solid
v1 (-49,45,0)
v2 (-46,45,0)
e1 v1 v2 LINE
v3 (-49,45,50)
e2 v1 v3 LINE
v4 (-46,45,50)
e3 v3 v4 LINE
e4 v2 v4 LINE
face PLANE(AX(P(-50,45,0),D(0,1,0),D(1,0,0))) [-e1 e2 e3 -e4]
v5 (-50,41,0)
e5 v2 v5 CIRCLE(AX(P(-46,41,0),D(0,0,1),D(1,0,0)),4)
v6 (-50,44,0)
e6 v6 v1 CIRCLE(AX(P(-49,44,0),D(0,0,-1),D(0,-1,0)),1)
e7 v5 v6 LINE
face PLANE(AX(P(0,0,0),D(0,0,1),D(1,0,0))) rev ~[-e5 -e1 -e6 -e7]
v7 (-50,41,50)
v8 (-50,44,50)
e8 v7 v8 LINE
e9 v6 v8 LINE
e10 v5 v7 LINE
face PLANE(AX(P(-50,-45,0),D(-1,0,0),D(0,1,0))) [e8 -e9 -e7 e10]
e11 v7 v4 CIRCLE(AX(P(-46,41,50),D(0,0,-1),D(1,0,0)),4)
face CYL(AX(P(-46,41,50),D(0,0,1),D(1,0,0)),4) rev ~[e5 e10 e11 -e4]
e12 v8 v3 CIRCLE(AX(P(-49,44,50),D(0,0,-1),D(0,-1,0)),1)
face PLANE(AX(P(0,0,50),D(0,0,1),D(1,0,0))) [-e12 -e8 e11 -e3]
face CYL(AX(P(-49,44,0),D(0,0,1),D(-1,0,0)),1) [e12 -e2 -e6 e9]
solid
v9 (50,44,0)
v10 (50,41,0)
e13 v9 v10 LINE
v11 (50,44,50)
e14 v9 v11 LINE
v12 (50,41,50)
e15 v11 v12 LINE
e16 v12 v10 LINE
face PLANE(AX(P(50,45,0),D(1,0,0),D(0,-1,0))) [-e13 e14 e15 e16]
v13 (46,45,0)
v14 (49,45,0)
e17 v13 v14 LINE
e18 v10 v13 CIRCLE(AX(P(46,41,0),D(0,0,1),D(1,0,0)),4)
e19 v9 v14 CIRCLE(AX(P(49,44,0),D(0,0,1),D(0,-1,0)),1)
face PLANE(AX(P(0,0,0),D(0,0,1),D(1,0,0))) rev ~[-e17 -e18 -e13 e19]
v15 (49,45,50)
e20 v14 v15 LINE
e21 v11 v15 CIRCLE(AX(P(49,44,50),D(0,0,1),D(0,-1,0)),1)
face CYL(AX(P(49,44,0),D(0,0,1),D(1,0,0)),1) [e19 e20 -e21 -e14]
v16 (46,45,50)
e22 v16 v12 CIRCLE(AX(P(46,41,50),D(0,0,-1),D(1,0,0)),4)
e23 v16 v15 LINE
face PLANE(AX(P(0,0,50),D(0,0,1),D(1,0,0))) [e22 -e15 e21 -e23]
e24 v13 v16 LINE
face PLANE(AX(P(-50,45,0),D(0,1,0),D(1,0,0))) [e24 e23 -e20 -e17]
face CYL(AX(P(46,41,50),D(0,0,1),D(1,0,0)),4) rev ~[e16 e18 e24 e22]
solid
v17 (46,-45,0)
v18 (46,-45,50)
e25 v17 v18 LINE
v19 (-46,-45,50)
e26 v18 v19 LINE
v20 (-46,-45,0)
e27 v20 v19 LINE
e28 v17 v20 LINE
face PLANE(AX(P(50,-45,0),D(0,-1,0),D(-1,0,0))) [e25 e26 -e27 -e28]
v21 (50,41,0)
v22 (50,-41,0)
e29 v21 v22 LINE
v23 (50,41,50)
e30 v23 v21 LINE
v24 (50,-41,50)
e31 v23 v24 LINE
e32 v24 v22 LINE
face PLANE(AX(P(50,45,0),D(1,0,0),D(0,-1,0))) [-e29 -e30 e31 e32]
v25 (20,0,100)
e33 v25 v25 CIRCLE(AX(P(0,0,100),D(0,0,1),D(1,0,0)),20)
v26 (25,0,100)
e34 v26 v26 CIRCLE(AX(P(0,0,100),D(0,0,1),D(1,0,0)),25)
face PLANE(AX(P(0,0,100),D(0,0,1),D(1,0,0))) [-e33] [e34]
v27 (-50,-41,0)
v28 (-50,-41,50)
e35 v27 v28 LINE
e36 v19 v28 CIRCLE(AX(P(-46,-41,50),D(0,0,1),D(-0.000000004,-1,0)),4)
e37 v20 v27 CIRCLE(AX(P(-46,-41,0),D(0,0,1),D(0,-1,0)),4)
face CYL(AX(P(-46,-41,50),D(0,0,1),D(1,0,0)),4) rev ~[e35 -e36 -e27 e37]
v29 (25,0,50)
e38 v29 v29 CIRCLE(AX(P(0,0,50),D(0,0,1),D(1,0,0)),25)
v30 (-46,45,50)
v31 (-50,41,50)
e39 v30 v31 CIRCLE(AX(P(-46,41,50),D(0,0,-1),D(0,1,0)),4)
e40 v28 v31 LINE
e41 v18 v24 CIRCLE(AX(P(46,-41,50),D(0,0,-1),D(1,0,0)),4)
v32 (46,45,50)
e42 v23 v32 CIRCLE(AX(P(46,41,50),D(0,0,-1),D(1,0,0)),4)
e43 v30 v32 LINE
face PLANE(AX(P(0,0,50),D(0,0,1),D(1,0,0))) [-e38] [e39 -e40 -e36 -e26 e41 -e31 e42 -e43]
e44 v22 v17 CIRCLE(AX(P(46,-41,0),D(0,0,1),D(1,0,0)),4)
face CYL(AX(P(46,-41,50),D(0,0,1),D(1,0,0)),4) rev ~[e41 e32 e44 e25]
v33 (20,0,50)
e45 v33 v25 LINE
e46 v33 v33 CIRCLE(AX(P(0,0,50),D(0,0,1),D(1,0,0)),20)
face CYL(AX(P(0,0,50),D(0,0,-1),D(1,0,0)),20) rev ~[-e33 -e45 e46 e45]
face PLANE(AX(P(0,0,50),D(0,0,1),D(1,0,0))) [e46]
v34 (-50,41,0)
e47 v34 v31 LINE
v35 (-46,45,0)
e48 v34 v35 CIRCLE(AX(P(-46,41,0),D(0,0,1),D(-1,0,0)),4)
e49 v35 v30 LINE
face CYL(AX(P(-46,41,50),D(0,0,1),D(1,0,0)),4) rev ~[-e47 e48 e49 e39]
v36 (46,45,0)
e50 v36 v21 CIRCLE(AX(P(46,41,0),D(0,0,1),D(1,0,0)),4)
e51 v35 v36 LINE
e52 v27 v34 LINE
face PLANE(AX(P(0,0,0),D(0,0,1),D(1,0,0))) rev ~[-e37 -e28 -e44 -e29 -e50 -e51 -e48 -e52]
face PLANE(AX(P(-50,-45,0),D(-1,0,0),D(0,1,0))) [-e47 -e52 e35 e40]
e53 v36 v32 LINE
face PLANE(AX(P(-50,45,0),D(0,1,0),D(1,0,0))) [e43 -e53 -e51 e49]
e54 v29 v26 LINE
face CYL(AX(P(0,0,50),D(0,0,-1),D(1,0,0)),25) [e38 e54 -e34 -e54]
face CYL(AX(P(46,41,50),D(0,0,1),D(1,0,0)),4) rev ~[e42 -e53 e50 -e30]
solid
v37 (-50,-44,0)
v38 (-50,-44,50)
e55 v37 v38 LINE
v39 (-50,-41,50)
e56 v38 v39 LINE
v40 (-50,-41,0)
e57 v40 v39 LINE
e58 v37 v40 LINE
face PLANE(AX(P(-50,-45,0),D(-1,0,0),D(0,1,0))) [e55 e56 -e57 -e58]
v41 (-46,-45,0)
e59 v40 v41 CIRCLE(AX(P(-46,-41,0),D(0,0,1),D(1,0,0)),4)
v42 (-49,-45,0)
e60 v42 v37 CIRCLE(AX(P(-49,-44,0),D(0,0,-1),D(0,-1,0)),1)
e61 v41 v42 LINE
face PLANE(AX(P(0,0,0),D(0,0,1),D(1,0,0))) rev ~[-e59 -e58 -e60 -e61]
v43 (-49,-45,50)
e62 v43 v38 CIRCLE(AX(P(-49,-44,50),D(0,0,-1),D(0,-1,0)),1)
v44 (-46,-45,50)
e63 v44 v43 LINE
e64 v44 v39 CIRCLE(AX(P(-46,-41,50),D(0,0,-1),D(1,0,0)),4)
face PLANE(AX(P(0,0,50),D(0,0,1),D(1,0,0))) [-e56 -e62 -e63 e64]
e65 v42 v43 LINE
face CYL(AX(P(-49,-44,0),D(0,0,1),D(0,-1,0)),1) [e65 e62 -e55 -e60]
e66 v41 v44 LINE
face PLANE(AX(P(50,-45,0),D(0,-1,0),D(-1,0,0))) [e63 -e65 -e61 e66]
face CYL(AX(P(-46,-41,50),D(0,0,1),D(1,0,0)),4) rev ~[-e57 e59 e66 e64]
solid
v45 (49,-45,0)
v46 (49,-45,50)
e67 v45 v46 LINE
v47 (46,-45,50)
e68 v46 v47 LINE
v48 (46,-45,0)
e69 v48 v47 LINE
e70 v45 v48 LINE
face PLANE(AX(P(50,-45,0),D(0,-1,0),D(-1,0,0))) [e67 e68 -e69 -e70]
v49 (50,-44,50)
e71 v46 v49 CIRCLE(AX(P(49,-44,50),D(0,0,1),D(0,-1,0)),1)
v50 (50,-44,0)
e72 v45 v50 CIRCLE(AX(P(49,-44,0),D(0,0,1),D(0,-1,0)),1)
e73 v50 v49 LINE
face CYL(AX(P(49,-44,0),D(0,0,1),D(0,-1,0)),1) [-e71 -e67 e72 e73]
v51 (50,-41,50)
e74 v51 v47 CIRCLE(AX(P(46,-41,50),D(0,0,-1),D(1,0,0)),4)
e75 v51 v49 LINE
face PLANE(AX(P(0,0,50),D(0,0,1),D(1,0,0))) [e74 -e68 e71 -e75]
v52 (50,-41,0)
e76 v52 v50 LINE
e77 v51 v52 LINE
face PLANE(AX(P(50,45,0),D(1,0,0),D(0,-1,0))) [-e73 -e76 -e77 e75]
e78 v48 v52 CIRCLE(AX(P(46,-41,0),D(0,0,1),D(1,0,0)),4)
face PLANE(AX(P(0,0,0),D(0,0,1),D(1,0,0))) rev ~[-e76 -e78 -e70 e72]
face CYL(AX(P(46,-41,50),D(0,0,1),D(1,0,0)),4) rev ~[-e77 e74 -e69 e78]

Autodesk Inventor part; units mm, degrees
ref_plane "YZ Plane" through (0, 0, 0) normal (1, 0, 0) x (0, 1, 0)
ref_plane "XZ Plane" through (0, 0, 0) normal (0, 1, 0) x (-1, 0, 0)
ref_plane "XY Plane" through (0, 0, 0) normal (0, 0, 1) x (1, 0, 0)
sketch "Sketch1" plane through (0, 0, 0) normal (0, 0, 1) x (1, 0, 0)
  line L0 (50, -45) -> (-50, -45)
  line L1 (-50, -45) -> (-50, 45)
  line L2 (-50, 45) -> (50, 45)
  line L3 (50, 45) -> (50, -45)
  line L4 (50, -45) -> (-50, 45) construction
  line L5 (-50, -45) -> (50, 45) construction
  point P0 (0, 0)
  dimension "d0" = 100
  dimension "d1" = 90
extrude "Extrusion1" add sketch "Sketch1" along normal blind 50
sketch "Sketch2" plane through (0, 0, 50) normal (0, 0, 1) x (1, 0, 0)
  line L0 (50, -45) -> (50, 45) projected
  line L1 (50, 45) -> (-50, 45) projected
  circle A0 centre (46, 41) radius 4
  circle A1 centre (-46, 41) radius 4
  line L2 (-50, 45) -> (-50, -45) projected
  circle A2 centre (-46, -41) radius 4
  line L3 (-50, -45) -> (50, -45) projected
  circle A3 centre (46, -41) radius 4
  point P0 (0, 0)
extrude "Extrusion2" cut sketch "Sketch2" against normal through all contours A3 | A0 | A2 | A1
sketch "Sketch3" plane through (0, 0, 50) normal (0, 0, 1) x (1, 0, 0)
  circle A0 centre (0, 0) radius 25
  circle A1 centre (0, 0) radius 20
extrude "Extrusion3" add sketch "Sketch3" along normal blind 50
thread "Thread1" size "M50x4" class "6H" standard "ANSI Metric M Profile" length 30
fillet "Fillet1" radius 1 1 edges at (50, 45, 25)
fillet "Fillet2" radius 1 3 edges at (50, -45, 25) (-50, -45, 25) (-50, 45, 25)
properties part number "Práctica1"
